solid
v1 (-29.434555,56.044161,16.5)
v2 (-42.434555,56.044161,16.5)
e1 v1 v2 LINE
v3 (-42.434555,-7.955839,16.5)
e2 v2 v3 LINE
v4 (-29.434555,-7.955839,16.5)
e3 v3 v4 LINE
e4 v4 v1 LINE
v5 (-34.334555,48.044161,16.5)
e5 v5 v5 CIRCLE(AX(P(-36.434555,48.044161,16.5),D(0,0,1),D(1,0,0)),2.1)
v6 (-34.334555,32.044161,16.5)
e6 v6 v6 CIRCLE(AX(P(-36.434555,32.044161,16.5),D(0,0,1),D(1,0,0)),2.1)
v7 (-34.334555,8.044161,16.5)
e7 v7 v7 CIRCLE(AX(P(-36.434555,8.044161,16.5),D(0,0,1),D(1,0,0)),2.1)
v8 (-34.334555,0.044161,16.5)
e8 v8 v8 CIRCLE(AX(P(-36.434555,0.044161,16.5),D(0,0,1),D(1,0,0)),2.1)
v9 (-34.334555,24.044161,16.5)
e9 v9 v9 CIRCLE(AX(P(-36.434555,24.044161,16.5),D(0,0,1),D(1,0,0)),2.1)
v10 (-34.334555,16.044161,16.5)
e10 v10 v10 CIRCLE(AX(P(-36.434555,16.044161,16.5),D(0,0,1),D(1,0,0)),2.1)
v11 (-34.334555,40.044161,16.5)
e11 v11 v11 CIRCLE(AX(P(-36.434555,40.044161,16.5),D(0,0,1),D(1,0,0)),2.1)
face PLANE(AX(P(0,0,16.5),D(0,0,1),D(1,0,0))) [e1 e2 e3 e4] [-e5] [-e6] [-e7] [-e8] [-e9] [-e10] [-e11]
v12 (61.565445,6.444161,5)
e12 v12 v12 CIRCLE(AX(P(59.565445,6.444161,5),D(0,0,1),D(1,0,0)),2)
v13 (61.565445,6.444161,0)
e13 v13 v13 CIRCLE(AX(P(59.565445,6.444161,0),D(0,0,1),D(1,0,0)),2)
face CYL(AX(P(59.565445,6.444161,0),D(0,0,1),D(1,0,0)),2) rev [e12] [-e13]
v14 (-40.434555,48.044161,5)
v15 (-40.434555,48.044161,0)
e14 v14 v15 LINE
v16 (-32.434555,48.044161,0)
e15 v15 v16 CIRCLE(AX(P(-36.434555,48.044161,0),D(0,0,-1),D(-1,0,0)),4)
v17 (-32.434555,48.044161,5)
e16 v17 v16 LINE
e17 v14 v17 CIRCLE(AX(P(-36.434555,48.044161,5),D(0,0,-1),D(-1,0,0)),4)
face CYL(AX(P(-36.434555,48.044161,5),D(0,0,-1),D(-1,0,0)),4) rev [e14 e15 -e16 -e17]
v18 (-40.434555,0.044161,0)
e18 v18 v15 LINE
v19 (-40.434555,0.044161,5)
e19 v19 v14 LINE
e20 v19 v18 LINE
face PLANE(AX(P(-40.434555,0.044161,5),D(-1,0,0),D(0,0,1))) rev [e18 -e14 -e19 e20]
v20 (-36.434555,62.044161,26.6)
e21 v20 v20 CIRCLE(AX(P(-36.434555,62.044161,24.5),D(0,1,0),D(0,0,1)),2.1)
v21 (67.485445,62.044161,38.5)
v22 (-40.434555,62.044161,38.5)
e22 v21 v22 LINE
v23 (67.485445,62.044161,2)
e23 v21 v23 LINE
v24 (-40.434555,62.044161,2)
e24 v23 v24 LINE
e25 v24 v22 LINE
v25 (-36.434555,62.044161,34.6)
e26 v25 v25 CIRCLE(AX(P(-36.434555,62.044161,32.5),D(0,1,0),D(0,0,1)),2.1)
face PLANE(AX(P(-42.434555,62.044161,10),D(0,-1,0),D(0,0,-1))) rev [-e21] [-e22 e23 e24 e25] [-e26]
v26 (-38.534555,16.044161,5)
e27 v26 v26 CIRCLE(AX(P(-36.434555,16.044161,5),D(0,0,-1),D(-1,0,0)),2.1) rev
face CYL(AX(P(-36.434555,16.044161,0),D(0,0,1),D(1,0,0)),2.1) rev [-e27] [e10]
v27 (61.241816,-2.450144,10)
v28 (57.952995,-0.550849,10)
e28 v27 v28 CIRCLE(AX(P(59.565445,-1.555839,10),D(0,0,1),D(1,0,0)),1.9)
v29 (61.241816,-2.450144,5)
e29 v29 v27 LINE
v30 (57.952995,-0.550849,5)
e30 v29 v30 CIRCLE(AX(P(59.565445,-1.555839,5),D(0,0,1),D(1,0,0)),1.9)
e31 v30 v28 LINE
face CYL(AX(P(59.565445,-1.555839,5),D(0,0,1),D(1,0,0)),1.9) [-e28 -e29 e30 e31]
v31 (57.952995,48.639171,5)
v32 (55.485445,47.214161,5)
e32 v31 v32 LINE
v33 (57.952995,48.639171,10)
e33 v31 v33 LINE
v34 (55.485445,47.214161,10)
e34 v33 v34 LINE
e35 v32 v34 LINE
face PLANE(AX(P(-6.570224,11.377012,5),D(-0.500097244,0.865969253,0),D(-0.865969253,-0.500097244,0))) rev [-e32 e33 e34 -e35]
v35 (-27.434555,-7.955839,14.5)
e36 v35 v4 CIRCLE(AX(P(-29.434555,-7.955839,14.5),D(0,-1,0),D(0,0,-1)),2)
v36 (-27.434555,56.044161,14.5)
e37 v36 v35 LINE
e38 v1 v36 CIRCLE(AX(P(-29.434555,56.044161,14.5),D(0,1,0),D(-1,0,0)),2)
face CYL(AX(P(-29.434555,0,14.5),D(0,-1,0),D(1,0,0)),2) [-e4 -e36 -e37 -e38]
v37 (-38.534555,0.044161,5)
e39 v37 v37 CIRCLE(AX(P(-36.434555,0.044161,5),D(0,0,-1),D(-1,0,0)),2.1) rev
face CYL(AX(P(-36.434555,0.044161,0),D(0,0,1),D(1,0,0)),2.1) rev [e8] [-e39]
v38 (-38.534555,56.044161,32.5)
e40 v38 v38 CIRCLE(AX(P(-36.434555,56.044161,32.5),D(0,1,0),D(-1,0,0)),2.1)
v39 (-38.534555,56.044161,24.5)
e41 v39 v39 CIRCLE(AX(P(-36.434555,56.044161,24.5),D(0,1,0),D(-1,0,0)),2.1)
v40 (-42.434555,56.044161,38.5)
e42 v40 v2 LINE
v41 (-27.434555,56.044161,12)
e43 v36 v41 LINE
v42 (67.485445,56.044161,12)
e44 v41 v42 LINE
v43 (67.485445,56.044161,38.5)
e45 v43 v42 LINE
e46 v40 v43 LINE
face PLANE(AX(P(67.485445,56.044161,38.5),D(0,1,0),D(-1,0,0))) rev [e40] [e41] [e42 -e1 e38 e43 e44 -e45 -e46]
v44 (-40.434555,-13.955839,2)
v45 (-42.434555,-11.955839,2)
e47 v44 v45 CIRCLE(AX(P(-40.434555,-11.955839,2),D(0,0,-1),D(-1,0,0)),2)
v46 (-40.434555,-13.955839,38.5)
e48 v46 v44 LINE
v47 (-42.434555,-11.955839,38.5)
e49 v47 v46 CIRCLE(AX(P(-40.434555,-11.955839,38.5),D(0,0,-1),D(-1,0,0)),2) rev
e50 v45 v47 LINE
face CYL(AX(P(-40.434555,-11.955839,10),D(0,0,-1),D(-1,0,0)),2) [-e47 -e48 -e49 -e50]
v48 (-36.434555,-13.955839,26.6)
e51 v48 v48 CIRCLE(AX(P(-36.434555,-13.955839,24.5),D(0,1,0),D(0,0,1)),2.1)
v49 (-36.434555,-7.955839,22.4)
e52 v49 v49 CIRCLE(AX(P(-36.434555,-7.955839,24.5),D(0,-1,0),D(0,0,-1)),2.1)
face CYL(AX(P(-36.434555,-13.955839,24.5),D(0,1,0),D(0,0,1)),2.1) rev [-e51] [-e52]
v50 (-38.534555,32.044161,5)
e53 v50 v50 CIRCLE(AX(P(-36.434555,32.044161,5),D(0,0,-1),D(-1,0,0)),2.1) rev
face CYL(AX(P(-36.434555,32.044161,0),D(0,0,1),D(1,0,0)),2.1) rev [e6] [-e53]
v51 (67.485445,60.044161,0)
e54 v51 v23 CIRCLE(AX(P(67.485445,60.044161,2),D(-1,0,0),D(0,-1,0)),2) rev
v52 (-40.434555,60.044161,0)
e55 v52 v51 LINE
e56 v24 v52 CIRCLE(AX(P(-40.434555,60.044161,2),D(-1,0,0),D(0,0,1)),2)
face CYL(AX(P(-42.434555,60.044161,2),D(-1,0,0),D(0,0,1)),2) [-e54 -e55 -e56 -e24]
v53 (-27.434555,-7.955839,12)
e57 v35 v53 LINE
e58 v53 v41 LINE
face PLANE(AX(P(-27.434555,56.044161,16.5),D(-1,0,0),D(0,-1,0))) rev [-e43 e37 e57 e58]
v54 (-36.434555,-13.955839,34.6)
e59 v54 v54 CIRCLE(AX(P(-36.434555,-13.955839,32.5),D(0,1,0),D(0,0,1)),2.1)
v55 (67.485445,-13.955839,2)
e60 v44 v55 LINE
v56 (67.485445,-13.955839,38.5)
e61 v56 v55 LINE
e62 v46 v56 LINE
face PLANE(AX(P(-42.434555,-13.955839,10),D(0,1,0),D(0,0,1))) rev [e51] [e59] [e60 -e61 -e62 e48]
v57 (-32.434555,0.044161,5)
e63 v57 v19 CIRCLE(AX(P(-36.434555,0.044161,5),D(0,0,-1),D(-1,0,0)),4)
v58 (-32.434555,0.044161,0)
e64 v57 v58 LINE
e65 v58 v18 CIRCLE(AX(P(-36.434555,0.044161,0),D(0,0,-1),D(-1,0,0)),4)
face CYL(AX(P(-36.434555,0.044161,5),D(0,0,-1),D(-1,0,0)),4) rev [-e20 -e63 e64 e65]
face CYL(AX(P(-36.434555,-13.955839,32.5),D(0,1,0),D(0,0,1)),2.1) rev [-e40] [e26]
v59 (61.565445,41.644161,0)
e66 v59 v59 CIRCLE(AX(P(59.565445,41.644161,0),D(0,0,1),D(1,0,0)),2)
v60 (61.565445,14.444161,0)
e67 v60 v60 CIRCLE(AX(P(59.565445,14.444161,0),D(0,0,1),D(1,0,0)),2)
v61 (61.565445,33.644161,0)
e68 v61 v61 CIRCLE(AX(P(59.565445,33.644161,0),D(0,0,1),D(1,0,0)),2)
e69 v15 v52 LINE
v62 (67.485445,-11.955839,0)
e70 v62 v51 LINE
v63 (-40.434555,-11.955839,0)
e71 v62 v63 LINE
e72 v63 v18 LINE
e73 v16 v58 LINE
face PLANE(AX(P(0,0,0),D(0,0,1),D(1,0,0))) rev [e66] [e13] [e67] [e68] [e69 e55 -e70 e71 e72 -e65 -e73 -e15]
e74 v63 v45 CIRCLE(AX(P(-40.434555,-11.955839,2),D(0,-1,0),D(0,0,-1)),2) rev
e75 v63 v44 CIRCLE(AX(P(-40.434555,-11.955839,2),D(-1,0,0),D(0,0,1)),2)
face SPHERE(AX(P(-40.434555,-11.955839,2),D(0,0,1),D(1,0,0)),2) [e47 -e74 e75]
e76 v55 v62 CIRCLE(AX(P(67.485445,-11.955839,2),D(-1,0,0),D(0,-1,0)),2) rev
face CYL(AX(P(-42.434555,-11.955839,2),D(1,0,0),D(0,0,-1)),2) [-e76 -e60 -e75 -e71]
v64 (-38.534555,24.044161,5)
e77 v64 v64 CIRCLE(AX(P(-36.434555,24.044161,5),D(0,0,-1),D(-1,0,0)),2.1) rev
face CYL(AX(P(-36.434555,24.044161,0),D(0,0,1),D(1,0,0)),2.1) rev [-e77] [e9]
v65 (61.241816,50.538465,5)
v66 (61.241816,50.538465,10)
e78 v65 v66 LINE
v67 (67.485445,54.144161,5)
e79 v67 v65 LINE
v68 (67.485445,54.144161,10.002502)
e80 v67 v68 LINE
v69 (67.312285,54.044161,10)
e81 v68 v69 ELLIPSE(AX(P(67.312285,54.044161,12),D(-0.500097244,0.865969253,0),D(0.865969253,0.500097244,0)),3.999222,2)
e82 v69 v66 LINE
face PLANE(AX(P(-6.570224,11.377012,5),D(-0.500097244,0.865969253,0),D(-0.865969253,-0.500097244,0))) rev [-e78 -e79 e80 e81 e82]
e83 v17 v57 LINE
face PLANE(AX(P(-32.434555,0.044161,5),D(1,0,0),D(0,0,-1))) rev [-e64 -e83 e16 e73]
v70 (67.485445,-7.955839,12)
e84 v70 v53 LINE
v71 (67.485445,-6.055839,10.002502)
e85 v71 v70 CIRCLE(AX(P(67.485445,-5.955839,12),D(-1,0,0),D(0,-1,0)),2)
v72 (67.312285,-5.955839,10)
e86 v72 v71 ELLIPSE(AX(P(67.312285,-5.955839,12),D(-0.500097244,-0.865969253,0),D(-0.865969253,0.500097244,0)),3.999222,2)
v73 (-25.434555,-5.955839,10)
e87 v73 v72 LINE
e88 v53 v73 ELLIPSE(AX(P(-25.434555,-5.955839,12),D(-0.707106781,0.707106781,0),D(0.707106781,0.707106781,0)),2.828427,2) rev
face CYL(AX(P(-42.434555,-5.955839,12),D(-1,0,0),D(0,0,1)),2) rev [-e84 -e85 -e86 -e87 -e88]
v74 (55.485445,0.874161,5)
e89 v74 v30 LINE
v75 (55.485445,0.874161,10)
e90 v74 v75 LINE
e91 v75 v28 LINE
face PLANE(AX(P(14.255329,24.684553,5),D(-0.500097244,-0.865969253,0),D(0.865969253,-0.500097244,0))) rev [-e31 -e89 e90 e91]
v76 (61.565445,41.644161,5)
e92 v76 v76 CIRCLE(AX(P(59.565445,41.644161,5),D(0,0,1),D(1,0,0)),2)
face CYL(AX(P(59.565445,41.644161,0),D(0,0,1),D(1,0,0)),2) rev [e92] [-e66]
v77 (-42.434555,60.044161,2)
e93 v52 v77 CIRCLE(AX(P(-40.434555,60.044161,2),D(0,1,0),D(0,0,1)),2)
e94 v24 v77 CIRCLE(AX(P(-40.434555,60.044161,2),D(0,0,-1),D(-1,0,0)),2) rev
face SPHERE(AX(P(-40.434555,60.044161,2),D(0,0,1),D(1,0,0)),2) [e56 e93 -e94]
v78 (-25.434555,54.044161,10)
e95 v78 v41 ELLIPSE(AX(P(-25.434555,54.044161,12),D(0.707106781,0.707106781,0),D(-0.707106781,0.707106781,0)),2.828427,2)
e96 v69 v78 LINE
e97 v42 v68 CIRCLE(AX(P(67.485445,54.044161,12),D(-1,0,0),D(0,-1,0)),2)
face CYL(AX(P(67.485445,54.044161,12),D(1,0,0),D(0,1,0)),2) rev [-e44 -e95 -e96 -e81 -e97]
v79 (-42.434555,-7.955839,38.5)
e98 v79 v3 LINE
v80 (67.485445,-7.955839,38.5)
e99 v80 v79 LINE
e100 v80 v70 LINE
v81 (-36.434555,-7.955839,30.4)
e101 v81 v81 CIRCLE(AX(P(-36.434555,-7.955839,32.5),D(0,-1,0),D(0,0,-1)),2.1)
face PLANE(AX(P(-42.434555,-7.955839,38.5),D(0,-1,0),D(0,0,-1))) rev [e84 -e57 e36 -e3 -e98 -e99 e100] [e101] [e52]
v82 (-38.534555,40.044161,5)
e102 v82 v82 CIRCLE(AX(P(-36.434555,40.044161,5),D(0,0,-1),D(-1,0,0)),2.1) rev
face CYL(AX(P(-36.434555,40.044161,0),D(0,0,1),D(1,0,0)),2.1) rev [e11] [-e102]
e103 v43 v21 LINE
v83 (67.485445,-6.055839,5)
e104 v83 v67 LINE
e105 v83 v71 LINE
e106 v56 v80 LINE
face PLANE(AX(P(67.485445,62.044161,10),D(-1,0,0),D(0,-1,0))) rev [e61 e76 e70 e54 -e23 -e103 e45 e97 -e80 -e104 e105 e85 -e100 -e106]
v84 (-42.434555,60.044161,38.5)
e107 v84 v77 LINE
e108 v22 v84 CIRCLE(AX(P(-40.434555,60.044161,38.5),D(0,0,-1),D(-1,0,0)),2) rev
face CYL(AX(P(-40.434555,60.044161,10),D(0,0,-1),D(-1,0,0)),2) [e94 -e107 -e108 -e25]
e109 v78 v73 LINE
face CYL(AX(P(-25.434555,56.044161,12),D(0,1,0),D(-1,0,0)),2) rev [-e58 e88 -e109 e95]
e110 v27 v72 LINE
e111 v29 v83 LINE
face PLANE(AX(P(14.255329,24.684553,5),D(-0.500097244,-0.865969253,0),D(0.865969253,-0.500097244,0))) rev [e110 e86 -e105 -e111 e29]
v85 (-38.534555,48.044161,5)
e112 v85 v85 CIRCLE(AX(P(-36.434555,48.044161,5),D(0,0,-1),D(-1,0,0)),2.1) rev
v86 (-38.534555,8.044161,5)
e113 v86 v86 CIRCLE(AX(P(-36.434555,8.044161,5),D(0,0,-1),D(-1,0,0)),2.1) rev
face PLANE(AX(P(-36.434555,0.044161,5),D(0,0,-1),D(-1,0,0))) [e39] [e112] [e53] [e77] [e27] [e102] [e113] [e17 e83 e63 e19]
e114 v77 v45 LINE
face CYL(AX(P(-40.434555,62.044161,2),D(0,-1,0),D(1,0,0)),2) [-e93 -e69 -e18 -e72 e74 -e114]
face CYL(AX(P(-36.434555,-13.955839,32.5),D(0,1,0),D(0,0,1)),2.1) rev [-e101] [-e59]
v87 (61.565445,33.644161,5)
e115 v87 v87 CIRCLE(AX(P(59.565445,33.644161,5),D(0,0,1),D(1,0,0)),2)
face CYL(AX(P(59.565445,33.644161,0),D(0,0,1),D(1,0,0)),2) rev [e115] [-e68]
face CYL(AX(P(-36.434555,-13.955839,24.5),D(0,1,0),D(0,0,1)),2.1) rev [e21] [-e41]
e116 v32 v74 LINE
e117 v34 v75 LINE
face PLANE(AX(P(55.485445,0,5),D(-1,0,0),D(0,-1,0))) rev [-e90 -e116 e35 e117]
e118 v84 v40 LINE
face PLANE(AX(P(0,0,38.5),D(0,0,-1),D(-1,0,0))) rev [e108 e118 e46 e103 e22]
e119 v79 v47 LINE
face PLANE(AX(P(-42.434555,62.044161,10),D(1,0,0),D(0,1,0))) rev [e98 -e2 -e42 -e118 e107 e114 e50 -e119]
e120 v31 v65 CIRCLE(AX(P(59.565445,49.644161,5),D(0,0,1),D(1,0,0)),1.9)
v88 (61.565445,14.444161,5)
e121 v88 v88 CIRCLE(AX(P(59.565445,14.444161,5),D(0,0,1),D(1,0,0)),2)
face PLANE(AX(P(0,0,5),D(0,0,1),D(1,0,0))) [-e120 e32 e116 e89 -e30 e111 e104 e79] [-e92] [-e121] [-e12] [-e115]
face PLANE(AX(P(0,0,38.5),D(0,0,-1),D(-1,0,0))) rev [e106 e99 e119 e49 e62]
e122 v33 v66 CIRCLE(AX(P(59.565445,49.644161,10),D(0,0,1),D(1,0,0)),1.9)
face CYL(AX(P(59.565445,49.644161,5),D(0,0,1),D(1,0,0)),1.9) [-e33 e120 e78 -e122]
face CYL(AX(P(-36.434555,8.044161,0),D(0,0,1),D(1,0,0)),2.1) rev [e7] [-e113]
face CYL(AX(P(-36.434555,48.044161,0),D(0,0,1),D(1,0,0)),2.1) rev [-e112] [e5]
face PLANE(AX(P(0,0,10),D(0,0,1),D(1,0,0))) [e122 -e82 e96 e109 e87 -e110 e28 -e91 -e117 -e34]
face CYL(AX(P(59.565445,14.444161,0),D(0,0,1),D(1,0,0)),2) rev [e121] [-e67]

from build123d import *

# Parameters (mm, degrees)
SKETCH_2_W               = 109.92
SKETCH_2_H               = 76
EXTRUDE_1_DEPTH          = 10
CUT_EXTRUDE_1_DEPTH      = 5
SKETCH_4_R               = 2
CUT_EXTRUDE_2_DEPTH      = 92.808295873
SKETCH_5_W               = 109.92
SKETCH_5_H               = 6
EXTRUDE_2_DEPTH          = 28.5
SKETCH_6_W               = 15
SKETCH_6_H               = 64
EXTRUDE_3_DEPTH          = 6.5
CUT_EXTRUDE_3_DEPTH      = 105.577891178
CUT_EXTRUDE_3_DEPTH_BACK = 105.577891178
SKETCH_7_R               = 2.1
SKETCH_9_R               = 2.1
CUT_EXTRUDE_4_DEPTH      = 95.274934055
CUT_EXTRUDE_5_DEPTH      = 5
FILLET_1_R               = 2


with BuildPart() as part:
    # 草圖2 → 填料-伸長1 (new body)
    with BuildSketch(Plane.XY):
        with Locations((12.52544527, 24.044160626)):
            Rectangle(SKETCH_2_W, SKETCH_2_H)
    extrude(amount=EXTRUDE_1_DEPTH)

    # 草圖3 → 除料-伸長1 (cut)
    with BuildSketch(Plane.XY.offset(10)):
        with BuildLine():
            Line((67.48544527, -6.055839374), (67.48544527, 54.144160626))
            Line((67.48544527, 54.144160626), (61.24181631, 50.538464901))
            ThreePointArc((61.24181631, 50.538464901), (61.408690367, 50.105080914), (61.46544527, 49.644160626))
            ThreePointArc((61.46544527, 49.644160626), (60.088104264, 47.81746208), (57.95299519, 48.639170705))
            Line((57.95299519, 48.639170705), (55.48544527, 47.214160626))
            Line((55.48544527, 47.214160626), (55.48544527, 0.874160626))
            Line((55.48544527, 0.874160626), (57.95299519, -0.550849453))
            ThreePointArc((57.95299519, -0.550849453), (60.088104264, 0.270859171), (61.46544527, -1.555839374))
            ThreePointArc((61.46544527, -1.555839374), (61.408690367, -2.016759663), (61.24181631, -2.45014365))
            Line((61.24181631, -2.45014365), (67.48544527, -6.055839374))
        make_face()
    extrude(amount=-CUT_EXTRUDE_1_DEPTH, mode=Mode.SUBTRACT)

    # 草圖4 → 除料-伸長2 (cut, through all)
    with BuildSketch(Plane.XY.offset(5)):
        with Locations((59.56544527, 41.644160626)):
            Circle(SKETCH_4_R)
        with Locations((59.56544527, 33.644160626)):
            Circle(SKETCH_4_R)
        with Locations((59.56544527, 6.444160626)):
            Circle(SKETCH_4_R)
        with Locations((59.56544527, 14.444160626)):
            Circle(SKETCH_4_R)
    extrude(amount=-CUT_EXTRUDE_2_DEPTH, mode=Mode.SUBTRACT)

    # 草圖5 → 填料-伸長2 (add)
    with BuildSketch(Plane.XY.offset(10)):
        with Locations((12.52544527, -10.955839374)):
            Rectangle(SKETCH_5_W, SKETCH_5_H)
        with Locations((12.52544527, 59.044160626)):
            Rectangle(SKETCH_5_W, SKETCH_5_H)
    extrude(amount=EXTRUDE_2_DEPTH)

    # 草圖6 → 填料-伸長3 (add)
    with BuildSketch(Plane.XY.offset(10)):
        with Locations((-34.93455473, 24.044160626)):
            Rectangle(SKETCH_6_W, SKETCH_6_H)
    extrude(amount=EXTRUDE_3_DEPTH)

    # 草圖7 → 除料-伸長3 (cut, two sides: drawn at the far end of the back side and taken through both)
    with BuildSketch(Plane(origin=(0, -7.955839374, 0), x_dir=(1, 0, 0), z_dir=(0, 1, 0)).offset(-CUT_EXTRUDE_3_DEPTH_BACK)):
        with Locations(Location((-36.43455473, -24.5, 0), (0, 0, 270))):
            Circle(SKETCH_7_R)
        with Locations(Location((-36.43455473, -32.5, 0), (0, 0, 270))):
            Circle(SKETCH_7_R)
    extrude(amount=CUT_EXTRUDE_3_DEPTH + CUT_EXTRUDE_3_DEPTH_BACK, mode=Mode.SUBTRACT)

    # 草圖9 → 除料-伸長4 (cut, through all)
    with BuildSketch(Plane.XY.offset(16.5)):
        with Locations((-36.43455473, 0.044160626)):
            Circle(SKETCH_9_R)
        with Locations((-36.43455473, 8.044160626)):
            Circle(SKETCH_9_R)
        with Locations((-36.43455473, 16.044160626)):
            Circle(SKETCH_9_R)
        with Locations((-36.43455473, 24.044160626)):
            Circle(SKETCH_9_R)
        with Locations((-36.43455473, 32.044160626)):
            Circle(SKETCH_9_R)
        with Locations((-36.43455473, 40.044160626)):
            Circle(SKETCH_9_R)
        with Locations((-36.43455473, 48.044160626)):
            Circle(SKETCH_9_R)
    extrude(amount=-CUT_EXTRUDE_4_DEPTH, mode=Mode.SUBTRACT)

    # 草圖10 → 除料-伸長5 (cut)
    with BuildSketch(Plane(origin=(0, 0, 0), x_dir=(-1, 0, 0), z_dir=(0, 0, -1))):
        with BuildLine():
            Line((32.43455473, 0.044160626), (32.43455473, 48.044160626))
            ThreePointArc((32.43455473, 48.044160626), (36.43455473, 52.044160626), (40.43455473, 48.044160626))
            Line((40.43455473, 48.044160626), (40.43455473, 0.044160626))
            ThreePointArc((40.43455473, 0.044160626), (36.43455473, -3.955839374), (32.43455473, 0.044160626))
        make_face()
    extrude(amount=-CUT_EXTRUDE_5_DEPTH, mode=Mode.SUBTRACT)

    # 圓角1
    fillet_1_edges = [part.edges().sort_by_distance(p)[0] for p in [
        (-27.43455473, 24.044160626, 16.5),
        (-27.43455473, 24.044160626, 10),
        (20.02544527, 56.044160626, 10),
        (20.02544527, -7.955839374, 10),
        (-42.43455473, 62.044160626, 19.25),
        (-42.43455473, -13.955839374, 19.25),
        (-42.43455473, 24.044160626, 0),
        (12.52544527, -13.955839374, 0),
        (12.52544527, 62.044160626, 0),
    ]]
    fillet(fillet_1_edges, radius=FILLET_1_R - 0.0001)  # a hair under: the kernel refuses the full size


solid = part.part
